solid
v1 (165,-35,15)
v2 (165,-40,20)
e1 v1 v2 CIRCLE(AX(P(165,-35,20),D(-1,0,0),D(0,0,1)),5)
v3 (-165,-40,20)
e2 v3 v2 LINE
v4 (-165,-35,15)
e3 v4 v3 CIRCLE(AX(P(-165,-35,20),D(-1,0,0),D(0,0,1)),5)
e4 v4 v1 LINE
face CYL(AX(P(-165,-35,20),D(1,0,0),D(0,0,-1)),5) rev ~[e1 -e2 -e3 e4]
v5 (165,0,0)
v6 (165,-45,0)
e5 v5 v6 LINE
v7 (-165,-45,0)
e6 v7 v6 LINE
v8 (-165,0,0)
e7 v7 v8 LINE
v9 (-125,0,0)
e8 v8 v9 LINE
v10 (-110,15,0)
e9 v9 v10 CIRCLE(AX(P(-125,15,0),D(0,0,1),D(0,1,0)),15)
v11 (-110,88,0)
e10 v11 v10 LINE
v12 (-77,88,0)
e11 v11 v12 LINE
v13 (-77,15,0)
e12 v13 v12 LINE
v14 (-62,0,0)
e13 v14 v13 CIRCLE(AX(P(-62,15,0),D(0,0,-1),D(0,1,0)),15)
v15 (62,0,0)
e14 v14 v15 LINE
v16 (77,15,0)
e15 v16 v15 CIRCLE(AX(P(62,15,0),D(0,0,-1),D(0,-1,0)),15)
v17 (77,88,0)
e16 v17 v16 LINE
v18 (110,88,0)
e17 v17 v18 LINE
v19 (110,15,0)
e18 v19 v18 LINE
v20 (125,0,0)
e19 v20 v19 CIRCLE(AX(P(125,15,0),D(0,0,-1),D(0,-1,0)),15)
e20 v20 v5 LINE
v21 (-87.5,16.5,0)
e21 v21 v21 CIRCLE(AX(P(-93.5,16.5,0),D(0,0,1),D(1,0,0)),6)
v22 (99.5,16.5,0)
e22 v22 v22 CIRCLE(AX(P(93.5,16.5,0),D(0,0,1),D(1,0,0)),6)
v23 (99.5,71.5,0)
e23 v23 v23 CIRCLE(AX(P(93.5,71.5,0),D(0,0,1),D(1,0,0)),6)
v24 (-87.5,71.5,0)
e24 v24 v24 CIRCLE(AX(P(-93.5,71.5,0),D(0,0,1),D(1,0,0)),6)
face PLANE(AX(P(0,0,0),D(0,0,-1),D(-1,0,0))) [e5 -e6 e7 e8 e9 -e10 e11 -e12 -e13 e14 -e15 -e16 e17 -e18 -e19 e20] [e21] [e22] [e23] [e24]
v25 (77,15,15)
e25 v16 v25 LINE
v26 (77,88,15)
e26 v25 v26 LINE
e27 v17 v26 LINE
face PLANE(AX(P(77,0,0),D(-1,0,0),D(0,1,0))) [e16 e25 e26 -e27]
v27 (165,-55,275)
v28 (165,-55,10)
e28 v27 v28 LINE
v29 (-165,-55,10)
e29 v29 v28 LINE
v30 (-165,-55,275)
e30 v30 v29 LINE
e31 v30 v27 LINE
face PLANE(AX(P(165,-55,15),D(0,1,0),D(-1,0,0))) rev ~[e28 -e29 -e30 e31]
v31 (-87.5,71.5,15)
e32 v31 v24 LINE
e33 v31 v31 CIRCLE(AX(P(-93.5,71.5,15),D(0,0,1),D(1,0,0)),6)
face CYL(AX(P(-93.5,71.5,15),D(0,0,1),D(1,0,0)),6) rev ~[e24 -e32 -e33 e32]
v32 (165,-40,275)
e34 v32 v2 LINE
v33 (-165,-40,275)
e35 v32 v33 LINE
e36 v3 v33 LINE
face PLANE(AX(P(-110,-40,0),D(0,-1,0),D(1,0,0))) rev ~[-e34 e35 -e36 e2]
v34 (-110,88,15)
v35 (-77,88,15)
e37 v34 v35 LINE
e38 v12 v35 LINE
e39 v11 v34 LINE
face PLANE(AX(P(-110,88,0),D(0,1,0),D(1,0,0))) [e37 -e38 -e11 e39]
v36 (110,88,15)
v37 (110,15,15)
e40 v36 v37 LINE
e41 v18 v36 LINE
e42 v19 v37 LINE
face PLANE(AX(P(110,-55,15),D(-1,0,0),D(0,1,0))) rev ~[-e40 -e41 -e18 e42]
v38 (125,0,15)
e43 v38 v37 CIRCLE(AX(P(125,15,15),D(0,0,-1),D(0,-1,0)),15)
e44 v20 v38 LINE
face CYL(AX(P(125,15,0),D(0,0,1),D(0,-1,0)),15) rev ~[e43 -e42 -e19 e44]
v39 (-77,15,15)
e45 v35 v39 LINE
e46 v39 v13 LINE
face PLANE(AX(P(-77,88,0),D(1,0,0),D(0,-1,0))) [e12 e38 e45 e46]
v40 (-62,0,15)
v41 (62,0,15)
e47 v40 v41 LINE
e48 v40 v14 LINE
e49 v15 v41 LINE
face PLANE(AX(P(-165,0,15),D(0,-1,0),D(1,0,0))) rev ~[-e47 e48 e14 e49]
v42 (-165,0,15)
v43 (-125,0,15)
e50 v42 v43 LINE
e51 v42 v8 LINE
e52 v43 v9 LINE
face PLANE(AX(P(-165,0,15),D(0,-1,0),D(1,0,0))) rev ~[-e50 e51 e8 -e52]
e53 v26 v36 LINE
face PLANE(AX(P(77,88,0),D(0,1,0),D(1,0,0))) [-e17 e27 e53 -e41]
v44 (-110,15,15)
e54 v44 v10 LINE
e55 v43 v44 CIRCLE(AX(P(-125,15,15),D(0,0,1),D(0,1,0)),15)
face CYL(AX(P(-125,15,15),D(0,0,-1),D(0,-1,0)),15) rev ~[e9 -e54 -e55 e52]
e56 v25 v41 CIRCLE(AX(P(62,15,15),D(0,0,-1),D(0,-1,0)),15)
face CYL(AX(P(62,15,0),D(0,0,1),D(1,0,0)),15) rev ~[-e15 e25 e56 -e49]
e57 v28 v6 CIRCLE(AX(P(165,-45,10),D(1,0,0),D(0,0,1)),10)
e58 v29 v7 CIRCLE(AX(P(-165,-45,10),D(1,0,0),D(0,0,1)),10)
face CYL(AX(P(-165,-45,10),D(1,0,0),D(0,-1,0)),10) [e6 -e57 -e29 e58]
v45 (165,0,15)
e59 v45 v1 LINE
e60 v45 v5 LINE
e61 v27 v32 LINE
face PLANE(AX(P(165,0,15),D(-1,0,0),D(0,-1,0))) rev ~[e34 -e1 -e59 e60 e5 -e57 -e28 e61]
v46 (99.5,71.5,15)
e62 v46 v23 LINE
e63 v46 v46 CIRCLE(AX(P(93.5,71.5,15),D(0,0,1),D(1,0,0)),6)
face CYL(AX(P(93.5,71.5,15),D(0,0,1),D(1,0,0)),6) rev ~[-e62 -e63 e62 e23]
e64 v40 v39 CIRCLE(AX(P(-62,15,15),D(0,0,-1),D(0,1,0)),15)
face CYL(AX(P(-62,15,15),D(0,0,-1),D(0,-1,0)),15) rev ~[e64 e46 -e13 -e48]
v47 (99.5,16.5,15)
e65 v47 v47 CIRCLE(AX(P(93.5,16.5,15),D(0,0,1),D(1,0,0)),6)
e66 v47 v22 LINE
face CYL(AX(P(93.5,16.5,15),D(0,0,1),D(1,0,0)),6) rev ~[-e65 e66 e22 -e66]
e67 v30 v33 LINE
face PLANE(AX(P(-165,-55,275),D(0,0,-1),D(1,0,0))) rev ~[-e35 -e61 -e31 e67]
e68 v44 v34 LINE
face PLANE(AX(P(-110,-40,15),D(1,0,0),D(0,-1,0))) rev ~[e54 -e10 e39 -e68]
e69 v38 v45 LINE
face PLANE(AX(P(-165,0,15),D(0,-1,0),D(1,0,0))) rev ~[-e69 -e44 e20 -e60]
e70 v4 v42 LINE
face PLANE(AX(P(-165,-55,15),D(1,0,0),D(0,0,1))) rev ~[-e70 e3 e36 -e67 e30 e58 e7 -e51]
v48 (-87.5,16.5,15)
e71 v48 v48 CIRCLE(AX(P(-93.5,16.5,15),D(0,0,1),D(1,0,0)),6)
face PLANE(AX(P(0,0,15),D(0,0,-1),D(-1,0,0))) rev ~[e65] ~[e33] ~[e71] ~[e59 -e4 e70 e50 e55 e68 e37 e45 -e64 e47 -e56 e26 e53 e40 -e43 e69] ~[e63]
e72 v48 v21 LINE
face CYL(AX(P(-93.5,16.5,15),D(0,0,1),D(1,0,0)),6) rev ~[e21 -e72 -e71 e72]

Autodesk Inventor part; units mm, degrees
ref_plane "YZ Plane" through (0, 0, 0) normal (1, 0, 0) x (0, 1, 0)
ref_plane "XZ Plane" through (0, 0, 0) normal (0, 1, 0) x (-1, 0, 0)
ref_plane "XY Plane" through (0, 0, 0) normal (0, 0, 1) x (1, 0, 0)
sketch "草圖1" plane through (0, 0, 0) normal (0, 0, 1) x (1, 0, 0)
  line L0 (0, 0) -> (0, 117.5667) construction
  line L1 (-139.2449, 0) -> (139.2449, 0) construction
  line L2 (-110, 88) -> (-77, 88)
  line L3 (-77, 88) -> (-77, 0)
  line L4 (-77, 0) -> (-110, 0)
  line L5 (-110, 0) -> (-110, 88)
  line L6 (77, 88) -> (110, 88)
  line L7 (110, 88) -> (110, 0)
  line L8 (110, 0) -> (77, 0)
  line L9 (77, 0) -> (77, 88)
  line L10 (-110, 0) -> (-77, 0)
  line L11 (-77, 0) -> (-77, -55)
  line L12 (-77, -55) -> (-110, -55)
  line L13 (-110, -55) -> (-110, 0)
  line L14 (77, 0) -> (110, 0)
  line L15 (110, 0) -> (110, -55)
  line L16 (110, -55) -> (77, -55)
  line L17 (77, -55) -> (77, 0)
  dimension "d0" = 33
  dimension "d1" = 33
  dimension "d2" = 220
  dimension "d3" = 110
  dimension "d4" = 88
  dimension "d5" = 88
  dimension "d6" = 55
  dimension "d7" = 55
extrude "擠出1" add sketch "草圖1" along normal blind 15
sketch "草圖2" plane through (0, 0, 15) normal (0, 0, 1) x (1, 0, 0)
  line L0 (-77, -55) -> (-110, -55) construction
  line L1 (-110, -55) -> (-110, 88) construction
  line L2 (-110, 88) -> (-77, 88) construction
  line L3 (-77, 88) -> (-77, -55) construction
  line L4 (77, 88) -> (110, 88) construction
  line L5 (110, 88) -> (110, -55) construction
  line L6 (110, -55) -> (77, -55) construction
  line L7 (77, -55) -> (77, 88) construction
  line L8 (-110, -55) -> (110, -55)
  line L9 (110, -55) -> (110, -40)
  line L10 (110, -40) -> (-110, -40)
  line L11 (-110, -40) -> (-110, -55)
  point P0 (0, 0)
  dimension "d10" = 15
extrude "擠出2" add sketch "草圖2" along normal blind 260
sketch "草圖3" plane through (0, 0, 15) normal (0, 0, 1) x (1, 0, 0)
  circle A0 centre (-93.5, 71.5) radius 6
  circle A1 centre (-93.5, 16.5) radius 6
  circle A2 centre (93.5, 71.5) radius 6
  circle A3 centre (93.5, 16.5) radius 6
  line L0 (110, 88) -> (77, 88) construction
  line L1 (-77, 88) -> (-110, 88) construction
  line L2 (-93.5, 88) -> (-93.5, -40) construction
  line L3 (-110, -40) -> (-77, -40) construction
  line L4 (93.5, 88) -> (93.5, -40) construction
  line L5 (110, -40) -> (-110, -40) construction
  point P0 (0, 0)
  dimension "d13" = 55
  dimension "d14" = 12
  dimension "d15" = 12
  dimension "d16" = 12
  dimension "d17" = 12
  dimension "d18" = 55
  dimension "d19" = 16.5
  dimension "d20" = 16.5
extrude "擠出3" cut sketch "草圖3" against normal blind 200
sketch "草圖4" plane through (-110, -55, 0) normal (0, -1, 0) x (1, 0, 0)
  line L0 (187, 15) -> (33, 15) construction
  line L1 (33, 15) -> (33, 0) construction
  line L2 (33, 0) -> (0, 0) construction
  line L3 (0, 0) -> (0, 275) construction
  line L4 (0, 275) -> (220, 275) construction
  line L5 (220, 275) -> (220, 0) construction
  line L6 (220, 0) -> (187, 0) construction
  line L7 (187, 0) -> (187, 15) construction
  line L8 (-55, 275) -> (275, 275)
  line L9 (275, 275) -> (275, 15)
  line L10 (275, 15) -> (-55, 15)
  line L11 (-55, 15) -> (-55, 275)
  point P0 (110, 0)
  point P1 (110, 275)
  point P2 (110, 15)
  dimension "d23" = 55
extrude "擠出4" add sketch "草圖4" against normal blind 15
sketch "草圖5" plane through (0, 0, 15) normal (0, 0, -1) x (-1, 0, 0)
  circle A0 centre (-93.5, 71.5) radius 6 construction
  circle A1 centre (93.5, 71.5) radius 6 construction
  circle A2 centre (-93.5, 16.5) radius 6 construction
  circle A3 centre (93.5, 16.5) radius 6 construction
  line L0 (-110, 88) -> (-77, 88) construction
  line L1 (-77, 88) -> (-77, -40) construction
  line L2 (-77, -40) -> (77, -40) construction
  line L3 (77, -55) -> (77, -40) construction
  line L4 (77, -55) -> (-77, -55) construction
  line L5 (-77, -55) -> (-110, -55) construction
  line L6 (-110, -55) -> (-110, -40) construction
  line L7 (-110, -40) -> (-77, -40) construction
  line L8 (-110, -40) -> (-110, 88) construction
  line L9 (-165, -40) -> (-110, -40) construction
  line L10 (-165, -55) -> (-165, -40) construction
  line L11 (-110, -55) -> (-165, -55) construction
  line L12 (-77, -40) -> (-77, -55) construction
  line L13 (77, -40) -> (110, -40) construction
  line L14 (110, -40) -> (110, -55) construction
  line L15 (165, -55) -> (110, -55) construction
  line L16 (165, -40) -> (165, -55) construction
  line L17 (110, -40) -> (165, -40) construction
  line L18 (110, 88) -> (110, -40) construction
  line L19 (77, 88) -> (110, 88) construction
  line L20 (77, -40) -> (77, 88) construction
  line L21 (110, -55) -> (77, -55) construction
  line L22 (-165, -55) -> (165, -55)
  line L23 (165, -55) -> (165, 0)
  line L24 (165, 0) -> (-165, 0)
  line L25 (-165, 0) -> (-165, -55)
  line L26 (165, -55) -> (165, -40) projected
  point P0 (0, 0)
  dimension "d26" = 40
extrude "擠出5" add sketch "草圖5" along normal blind 15
fillet "圓角1" radius 10 1 edges at (0, -55, 0)
fillet "圓角2" radius 5 1 edges at (0, -40, 15)
fillet "圓角3" radius 15 4 edges at (-77, 0, 7.5) (-110, 0, 7.5) (77, 0, 7.5) (110, 0, 7.5)
equation "\"d3\" = 0.5 * d2"
equation "\"d15\" = d14"
equation "\"d16\" = d14"
equation "\"d17\" = d14"
equation "\"d18\" = d13"
equation "\"d20\" = d19"
